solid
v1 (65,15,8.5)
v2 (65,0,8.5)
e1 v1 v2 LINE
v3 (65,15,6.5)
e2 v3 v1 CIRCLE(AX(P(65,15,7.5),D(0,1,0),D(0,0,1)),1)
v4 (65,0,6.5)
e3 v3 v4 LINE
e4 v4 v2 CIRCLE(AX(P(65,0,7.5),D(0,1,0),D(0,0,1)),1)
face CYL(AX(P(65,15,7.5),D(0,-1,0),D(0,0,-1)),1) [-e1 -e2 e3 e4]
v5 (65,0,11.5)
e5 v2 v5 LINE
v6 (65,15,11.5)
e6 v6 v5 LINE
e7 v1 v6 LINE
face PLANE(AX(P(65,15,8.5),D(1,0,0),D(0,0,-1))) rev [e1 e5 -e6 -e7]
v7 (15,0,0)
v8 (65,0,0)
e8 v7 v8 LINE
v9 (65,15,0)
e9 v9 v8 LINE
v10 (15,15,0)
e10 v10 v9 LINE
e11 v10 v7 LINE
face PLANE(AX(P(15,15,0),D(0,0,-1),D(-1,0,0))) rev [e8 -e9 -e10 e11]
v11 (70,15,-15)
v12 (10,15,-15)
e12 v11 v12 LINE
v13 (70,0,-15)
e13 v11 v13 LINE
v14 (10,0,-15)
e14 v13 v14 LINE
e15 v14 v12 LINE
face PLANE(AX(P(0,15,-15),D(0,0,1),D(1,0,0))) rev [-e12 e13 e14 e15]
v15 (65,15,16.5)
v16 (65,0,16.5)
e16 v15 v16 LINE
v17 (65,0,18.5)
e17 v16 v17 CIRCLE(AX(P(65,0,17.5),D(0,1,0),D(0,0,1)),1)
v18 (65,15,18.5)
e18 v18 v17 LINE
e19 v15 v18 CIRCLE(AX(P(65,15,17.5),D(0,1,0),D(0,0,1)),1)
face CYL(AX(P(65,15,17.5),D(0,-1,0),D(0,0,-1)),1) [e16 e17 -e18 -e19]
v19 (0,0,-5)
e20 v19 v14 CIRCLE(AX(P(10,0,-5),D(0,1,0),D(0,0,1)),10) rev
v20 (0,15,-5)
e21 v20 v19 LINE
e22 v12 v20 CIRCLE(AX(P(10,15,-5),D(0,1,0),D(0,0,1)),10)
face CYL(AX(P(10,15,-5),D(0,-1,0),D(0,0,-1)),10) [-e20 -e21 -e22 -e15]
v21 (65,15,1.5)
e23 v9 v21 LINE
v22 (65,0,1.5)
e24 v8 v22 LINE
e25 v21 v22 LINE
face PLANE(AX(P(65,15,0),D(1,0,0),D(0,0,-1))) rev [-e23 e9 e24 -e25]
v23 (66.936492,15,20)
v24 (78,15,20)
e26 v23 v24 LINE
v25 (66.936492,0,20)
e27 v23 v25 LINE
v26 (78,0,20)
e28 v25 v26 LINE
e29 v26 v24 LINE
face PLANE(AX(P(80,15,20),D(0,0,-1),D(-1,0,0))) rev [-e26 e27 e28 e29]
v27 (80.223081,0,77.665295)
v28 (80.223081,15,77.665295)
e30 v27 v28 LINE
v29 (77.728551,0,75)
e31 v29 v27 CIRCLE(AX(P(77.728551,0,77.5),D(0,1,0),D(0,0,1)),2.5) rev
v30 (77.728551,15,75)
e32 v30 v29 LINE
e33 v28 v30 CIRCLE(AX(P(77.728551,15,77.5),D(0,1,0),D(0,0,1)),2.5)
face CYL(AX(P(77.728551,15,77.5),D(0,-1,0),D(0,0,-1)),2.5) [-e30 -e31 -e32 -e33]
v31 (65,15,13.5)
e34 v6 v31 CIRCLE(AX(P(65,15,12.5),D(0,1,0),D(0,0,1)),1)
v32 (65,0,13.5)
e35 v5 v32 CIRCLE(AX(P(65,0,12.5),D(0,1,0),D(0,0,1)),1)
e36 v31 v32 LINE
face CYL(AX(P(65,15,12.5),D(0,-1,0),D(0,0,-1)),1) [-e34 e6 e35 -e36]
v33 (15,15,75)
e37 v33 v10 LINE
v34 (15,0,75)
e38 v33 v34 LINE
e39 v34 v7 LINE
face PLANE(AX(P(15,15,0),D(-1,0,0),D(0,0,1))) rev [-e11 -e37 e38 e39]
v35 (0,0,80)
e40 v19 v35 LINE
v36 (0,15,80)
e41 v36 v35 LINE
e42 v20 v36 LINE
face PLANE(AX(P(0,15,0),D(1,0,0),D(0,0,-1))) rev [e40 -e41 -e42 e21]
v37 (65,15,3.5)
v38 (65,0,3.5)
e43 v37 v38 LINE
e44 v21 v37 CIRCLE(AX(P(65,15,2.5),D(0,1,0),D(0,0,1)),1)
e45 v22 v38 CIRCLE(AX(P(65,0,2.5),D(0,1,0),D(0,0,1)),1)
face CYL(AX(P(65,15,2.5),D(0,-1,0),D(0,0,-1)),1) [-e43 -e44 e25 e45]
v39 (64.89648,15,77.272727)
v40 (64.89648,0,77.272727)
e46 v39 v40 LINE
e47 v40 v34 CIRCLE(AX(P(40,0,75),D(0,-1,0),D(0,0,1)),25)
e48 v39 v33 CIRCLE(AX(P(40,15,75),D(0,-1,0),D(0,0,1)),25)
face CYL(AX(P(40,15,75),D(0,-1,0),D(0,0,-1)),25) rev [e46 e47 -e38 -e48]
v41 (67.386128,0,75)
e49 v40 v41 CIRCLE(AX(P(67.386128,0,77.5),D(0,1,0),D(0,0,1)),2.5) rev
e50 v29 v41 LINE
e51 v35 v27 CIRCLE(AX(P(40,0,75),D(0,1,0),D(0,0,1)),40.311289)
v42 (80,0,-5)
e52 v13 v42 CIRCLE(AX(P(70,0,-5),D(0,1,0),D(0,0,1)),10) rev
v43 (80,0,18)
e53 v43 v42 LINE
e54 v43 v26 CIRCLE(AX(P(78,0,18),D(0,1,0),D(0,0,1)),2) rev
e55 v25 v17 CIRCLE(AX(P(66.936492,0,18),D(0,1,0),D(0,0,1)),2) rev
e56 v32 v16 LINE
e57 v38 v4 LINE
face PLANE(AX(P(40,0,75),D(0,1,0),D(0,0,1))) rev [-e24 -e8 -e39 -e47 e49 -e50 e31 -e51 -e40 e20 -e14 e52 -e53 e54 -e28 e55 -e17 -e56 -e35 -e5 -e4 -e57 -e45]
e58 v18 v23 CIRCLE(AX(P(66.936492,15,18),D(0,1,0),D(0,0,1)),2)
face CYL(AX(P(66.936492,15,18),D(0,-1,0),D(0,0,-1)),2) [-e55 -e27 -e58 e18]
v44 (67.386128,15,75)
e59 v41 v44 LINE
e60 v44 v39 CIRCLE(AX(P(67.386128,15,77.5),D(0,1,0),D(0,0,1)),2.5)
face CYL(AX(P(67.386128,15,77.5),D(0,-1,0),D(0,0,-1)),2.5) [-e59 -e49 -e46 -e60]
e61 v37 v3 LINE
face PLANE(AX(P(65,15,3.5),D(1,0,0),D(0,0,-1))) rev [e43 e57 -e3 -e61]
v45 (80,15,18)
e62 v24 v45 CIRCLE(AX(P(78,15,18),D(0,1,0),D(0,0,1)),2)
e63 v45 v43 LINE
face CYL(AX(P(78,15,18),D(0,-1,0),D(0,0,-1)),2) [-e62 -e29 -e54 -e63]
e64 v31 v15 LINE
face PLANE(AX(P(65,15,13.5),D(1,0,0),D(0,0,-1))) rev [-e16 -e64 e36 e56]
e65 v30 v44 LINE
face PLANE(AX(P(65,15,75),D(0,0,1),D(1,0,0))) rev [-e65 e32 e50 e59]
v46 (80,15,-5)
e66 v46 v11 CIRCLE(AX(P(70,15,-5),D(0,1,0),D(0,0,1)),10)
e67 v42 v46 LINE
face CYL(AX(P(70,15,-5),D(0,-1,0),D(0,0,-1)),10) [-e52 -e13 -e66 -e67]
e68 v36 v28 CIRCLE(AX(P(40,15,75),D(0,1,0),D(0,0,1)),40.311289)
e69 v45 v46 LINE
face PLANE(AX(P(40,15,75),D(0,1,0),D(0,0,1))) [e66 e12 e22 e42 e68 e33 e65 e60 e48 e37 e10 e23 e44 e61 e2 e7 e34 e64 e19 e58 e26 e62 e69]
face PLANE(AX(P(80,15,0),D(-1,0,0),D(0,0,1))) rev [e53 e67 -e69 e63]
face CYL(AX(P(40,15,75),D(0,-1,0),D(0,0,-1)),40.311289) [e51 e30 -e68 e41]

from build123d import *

# Parameters (mm, degrees)
BOSS_EXTRUDE1_DEPTH = 15
FILLET1_R           = 10
FILLET3_R           = 2
FILLET6_R           = 2.5


with BuildPart() as part:
    # Sketch1 → Boss-Extrude1 (new body)
    with BuildSketch(Plane(origin=(0, 0, 0), x_dir=(1, 0, 0), z_dir=(0, 1, 0))):
        with BuildLine():
            Line((65, -75), (80.311288741, -75))
            ThreePointArc((80.311288741, -75), (42.504840348, -115.233391292), (0, -80))
            Line((0, -80), (0, -50))
            Line((0, -50), (0, 0))
            Line((0, 0), (0, 15))
            Line((0, 15), (80, 15))
            Line((80, 15), (80, 0))
            Line((80, 0), (80, -20))
            Line((80, -20), (65, -20))
            Line((65, -20), (65, -18.5))
            ThreePointArc((65, -18.5), (64, -17.5), (65, -16.5))
            Line((65, -16.5), (65, -13.5))
            ThreePointArc((65, -13.5), (64, -12.5), (65, -11.5))
            Line((65, -11.5), (65, -8.5))
            ThreePointArc((65, -8.5), (64, -7.5), (65, -6.5))
            Line((65, -6.5), (65, -3.5))
            ThreePointArc((65, -3.5), (64, -2.5), (65, -1.5))
            Line((65, -1.5), (65, 0))
            Line((65, 0), (15, 0))
            Line((15, 0), (15, -50))
            Line((15, -50), (15, -75))
            ThreePointArc((15, -75), (40, -100), (65, -75))
        make_face()
    extrude(amount=BOSS_EXTRUDE1_DEPTH)

    # Fillet1
    fillet1_edges = [part.edges().sort_by_distance(p)[0] for p in [
        (0, 7.5, -15),
        (80, 7.5, -15),
    ]]
    fillet(fillet1_edges, radius=FILLET1_R)

    # Fillet3
    # the kernel refuses this fillet: 2 mm, written as the material it takes off along each edge
    with BuildSketch(Plane(origin=(80, -5, 20), x_dir=(0, 0, -1), z_dir=(0, 1, 0))) as fillet3_piece_1:
        with BuildLine():
            CenterArc((FILLET3_R, FILLET3_R), FILLET3_R, 180, 90)
            Line((0, FILLET3_R), (-FILLET3_R * 0.02, FILLET3_R))
            Line((-FILLET3_R * 0.02, FILLET3_R), (-FILLET3_R * 0.02, -FILLET3_R * 0.02))
            Line((-FILLET3_R * 0.02, -FILLET3_R * 0.02), (FILLET3_R, -FILLET3_R * 0.02))
            Line((FILLET3_R, -FILLET3_R * 0.02), (FILLET3_R, 0))
        make_face()
    extrude(amount=25, mode=Mode.SUBTRACT)
    with BuildSketch(Plane(origin=(65, -4.841229183, 20), x_dir=(1, 0, 0), z_dir=(0, 1, 0))) as fillet3_piece_2:
        with BuildLine():
            CenterArc((1.936491673, 2), FILLET3_R, 194.477512186, 75.522487814)
            Line((0, 1.5), (-0.038729833, 1.49))
            ThreePointArc((-0.038729833, 1.49), (-0.04, 0.75), (-0.04, 0))
            Line((-0.04, 0), (0, -0.04))
            Line((0, -0.04), (1.936491673, -0.04))
            Line((1.936491673, -0.04), (1.936491673, 0))
        make_face()
    extrude(amount=24.682458366, mode=Mode.SUBTRACT)

    # Fillet6
    fillet6_edges = [part.edges().sort_by_distance(p)[0] for p in [
        (65, 7.5, 75),
        (80.311288741, 7.5, 75),
    ]]
    fillet(fillet6_edges, radius=FILLET6_R)


solid = part.part
